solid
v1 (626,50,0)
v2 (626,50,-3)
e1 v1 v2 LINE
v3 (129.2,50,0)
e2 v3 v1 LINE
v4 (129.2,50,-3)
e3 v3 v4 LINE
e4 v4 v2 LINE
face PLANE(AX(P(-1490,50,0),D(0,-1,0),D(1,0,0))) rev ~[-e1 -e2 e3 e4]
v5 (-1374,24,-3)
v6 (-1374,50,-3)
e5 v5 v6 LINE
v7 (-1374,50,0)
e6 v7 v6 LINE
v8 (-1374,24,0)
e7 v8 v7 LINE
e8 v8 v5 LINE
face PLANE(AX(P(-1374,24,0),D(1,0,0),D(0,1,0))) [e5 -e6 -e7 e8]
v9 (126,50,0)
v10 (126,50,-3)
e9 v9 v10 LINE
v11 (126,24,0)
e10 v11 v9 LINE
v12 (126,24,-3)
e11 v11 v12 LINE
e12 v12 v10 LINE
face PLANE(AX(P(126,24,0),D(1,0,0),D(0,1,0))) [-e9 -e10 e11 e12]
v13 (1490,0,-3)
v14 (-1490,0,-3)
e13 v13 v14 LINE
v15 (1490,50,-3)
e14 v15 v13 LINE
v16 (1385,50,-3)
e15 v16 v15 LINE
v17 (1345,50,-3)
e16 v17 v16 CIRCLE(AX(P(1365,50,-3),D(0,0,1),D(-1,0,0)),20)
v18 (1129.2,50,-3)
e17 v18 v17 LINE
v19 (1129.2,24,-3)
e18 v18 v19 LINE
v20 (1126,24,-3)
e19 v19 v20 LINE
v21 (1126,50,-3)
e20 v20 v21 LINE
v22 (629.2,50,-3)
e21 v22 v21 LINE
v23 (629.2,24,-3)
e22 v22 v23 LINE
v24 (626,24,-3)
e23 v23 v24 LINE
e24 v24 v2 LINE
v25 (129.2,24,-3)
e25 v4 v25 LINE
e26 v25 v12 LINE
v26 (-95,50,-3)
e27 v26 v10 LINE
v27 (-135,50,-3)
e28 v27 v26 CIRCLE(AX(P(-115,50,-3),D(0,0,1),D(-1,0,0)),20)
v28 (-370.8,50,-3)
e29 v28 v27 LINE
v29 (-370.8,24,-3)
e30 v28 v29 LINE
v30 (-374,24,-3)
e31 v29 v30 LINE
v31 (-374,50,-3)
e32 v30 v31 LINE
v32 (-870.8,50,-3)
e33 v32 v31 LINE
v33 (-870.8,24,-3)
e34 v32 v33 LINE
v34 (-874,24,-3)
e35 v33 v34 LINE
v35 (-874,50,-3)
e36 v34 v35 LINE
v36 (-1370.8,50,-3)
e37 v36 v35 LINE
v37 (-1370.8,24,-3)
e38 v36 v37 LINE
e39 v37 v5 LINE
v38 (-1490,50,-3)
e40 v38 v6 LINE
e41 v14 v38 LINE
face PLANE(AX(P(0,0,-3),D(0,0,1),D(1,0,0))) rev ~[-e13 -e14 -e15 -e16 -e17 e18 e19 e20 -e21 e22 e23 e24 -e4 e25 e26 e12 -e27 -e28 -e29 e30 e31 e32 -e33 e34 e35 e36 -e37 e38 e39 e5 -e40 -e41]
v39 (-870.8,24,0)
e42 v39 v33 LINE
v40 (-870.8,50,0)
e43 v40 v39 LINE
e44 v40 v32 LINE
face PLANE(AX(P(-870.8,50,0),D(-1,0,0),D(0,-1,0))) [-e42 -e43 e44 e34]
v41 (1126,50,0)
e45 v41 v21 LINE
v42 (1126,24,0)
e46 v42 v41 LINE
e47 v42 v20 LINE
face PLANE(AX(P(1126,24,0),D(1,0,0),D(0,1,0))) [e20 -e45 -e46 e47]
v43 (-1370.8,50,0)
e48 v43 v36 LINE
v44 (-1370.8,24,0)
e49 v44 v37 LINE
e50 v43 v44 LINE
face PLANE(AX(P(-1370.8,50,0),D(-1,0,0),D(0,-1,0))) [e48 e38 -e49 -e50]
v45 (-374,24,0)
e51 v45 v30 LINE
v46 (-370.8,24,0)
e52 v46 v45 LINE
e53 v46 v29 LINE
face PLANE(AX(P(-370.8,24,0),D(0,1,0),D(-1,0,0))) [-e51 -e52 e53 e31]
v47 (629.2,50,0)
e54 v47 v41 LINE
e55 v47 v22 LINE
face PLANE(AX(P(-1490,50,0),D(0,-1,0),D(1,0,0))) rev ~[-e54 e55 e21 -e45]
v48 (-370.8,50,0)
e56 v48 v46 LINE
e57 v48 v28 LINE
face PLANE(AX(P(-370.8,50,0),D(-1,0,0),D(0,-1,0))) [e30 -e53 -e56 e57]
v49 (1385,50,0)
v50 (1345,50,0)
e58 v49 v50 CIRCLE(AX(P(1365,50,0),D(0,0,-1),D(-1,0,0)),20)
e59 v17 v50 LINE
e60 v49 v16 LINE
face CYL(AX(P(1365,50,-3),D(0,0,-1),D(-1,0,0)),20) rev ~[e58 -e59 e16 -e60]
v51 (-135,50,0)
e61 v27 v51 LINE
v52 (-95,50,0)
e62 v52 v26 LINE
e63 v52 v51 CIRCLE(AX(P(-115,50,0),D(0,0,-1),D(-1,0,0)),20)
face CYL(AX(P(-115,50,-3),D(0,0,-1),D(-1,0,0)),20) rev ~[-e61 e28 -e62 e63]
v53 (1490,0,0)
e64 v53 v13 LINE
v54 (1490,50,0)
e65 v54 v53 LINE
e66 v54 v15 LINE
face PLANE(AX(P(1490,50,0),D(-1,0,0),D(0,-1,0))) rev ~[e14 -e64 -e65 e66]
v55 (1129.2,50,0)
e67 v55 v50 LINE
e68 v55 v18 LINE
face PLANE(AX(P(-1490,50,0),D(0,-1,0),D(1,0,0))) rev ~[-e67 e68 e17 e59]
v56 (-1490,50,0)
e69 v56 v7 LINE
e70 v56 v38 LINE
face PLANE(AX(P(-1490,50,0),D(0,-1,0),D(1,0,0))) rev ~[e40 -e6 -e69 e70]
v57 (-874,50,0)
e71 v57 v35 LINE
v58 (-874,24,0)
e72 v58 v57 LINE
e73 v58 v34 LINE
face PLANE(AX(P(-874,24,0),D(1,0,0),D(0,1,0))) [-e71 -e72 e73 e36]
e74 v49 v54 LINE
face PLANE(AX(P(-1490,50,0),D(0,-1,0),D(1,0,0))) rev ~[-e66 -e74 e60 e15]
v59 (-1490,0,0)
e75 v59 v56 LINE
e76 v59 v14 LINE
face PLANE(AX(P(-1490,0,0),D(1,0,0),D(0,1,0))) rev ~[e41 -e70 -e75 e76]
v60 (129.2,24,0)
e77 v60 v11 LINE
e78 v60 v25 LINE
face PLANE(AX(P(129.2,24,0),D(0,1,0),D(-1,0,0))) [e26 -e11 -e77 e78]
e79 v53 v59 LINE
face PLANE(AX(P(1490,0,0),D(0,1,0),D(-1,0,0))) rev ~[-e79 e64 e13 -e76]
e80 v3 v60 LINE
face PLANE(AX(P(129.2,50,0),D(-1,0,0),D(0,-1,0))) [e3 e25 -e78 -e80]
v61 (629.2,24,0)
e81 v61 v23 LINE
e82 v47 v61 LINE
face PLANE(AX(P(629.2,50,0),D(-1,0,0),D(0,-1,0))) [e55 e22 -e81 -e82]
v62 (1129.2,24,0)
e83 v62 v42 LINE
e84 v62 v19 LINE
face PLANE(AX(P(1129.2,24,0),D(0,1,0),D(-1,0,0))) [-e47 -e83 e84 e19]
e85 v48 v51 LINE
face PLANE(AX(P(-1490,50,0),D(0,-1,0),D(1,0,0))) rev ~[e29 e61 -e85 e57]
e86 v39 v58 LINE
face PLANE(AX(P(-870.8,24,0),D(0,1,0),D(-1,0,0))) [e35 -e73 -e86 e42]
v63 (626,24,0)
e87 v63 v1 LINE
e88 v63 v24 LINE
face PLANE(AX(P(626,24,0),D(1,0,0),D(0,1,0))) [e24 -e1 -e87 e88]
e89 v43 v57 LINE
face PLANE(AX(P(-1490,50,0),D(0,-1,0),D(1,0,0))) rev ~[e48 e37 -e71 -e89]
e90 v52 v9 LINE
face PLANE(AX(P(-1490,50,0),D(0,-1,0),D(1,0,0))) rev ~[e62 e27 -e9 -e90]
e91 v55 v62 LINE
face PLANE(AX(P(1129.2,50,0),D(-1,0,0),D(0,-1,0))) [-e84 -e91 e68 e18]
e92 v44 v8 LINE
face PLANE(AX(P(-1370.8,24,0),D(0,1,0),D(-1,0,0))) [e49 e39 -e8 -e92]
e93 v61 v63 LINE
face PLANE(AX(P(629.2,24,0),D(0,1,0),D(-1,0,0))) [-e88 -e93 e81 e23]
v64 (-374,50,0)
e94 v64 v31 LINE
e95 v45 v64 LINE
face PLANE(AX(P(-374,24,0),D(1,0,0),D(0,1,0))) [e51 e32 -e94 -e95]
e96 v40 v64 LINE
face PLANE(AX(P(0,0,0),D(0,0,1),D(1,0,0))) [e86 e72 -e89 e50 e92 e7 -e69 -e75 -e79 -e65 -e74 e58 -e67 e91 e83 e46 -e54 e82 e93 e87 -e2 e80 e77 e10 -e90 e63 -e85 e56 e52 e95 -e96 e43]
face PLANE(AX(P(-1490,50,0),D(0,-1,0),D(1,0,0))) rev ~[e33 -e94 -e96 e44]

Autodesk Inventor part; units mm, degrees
ref_plane "YZ Plane" through (0, 0, 0) normal (1, 0, 0) x (0, 1, 0)
ref_plane "XZ Plane" through (0, 0, 0) normal (0, 1, 0) x (-1, 0, 0)
ref_plane "XY Plane" through (0, 0, 0) normal (0, 0, 1) x (1, 0, 0)
sketch "Sketch8" plane through (0, 0, 0) normal (0, 0, 1) x (1, 0, 0)
  line L0 (-1490, 50) -> (1490, 50)
  line L1 (1490, 50) -> (1490, 0)
  line L2 (1490, 0) -> (-1490, 0)
  line L3 (-1490, 0) -> (-1490, 50)
  point P0 (0, 0)
  point P1 (0, 0)
  dimension "d37" = 50
  dimension "d38" = 2980
extrude "Plate5" add sketch "Sketch8" against normal blind 3
sketch "Sketch9" plane through (0, 0, 0) normal (0, 0, 1) x (1, 0, 0)
  line L0 (1490, 50) -> (-1490, 50) projected
  line L1 (-1374, 50) -> (-1370.8, 50)
  line L2 (-1370.8, 50) -> (-1370.8, 24)
  line L3 (-1370.8, 24) -> (-1374, 24)
  line L4 (-1374, 24) -> (-1374, 50)
  point P0 (0, 0)
  point P1 (-1370.8, 50)
  dimension "d40" = 116
  dimension "d41" = 3.2
  dimension "d42" = 26
extrude "Extrusion3" cut sketch "Sketch9" against normal through all
pattern_linear "Rectangular Pattern2" count 6 spacing 500 along (1, 0, 0) of "Extrusion3"
sketch "Sketch10" plane through (0, 0, -3) normal (0, 0, -1) x (-1, 0, 0)
  line L0 (-626, 50) -> (-626, 24) projected
  line L1 (-626, 24) -> (-629.2, 24) projected
  line L2 (-629.2, 24) -> (-629.2, 50) projected
  line L3 (-1490, 50) -> (-1129.2, 50) projected
  line L4 (-1490, 0) -> (-1490, 50) projected
  line L5 (1490, 0) -> (-1490, 0) projected
  line L6 (1490, 50) -> (1490, 0) projected
  line L7 (1374, 50) -> (1490, 50) projected
  line L8 (1374, 50) -> (1374, 24) projected
  line L9 (1374, 24) -> (1370.8, 24) projected
  line L10 (1370.8, 24) -> (1370.8, 50) projected
  line L11 (874, 50) -> (1370.8, 50) projected
  line L12 (874, 50) -> (874, 24) projected
  line L13 (874, 24) -> (870.8, 24) projected
  line L14 (870.8, 24) -> (870.8, 50) projected
  line L15 (374, 50) -> (870.8, 50) projected
  line L16 (374, 50) -> (374, 24) projected
  line L17 (374, 24) -> (370.8, 24) projected
  line L18 (370.8, 24) -> (370.8, 50) projected
  line L19 (-126, 50) -> (370.8, 50) projected
  line L20 (-126, 50) -> (-126, 24) projected
  line L21 (-126, 24) -> (-129.2, 24) projected
  line L22 (-129.2, 24) -> (-129.2, 50) projected
  line L23 (-626, 50) -> (-129.2, 50) projected
  circle A0 centre (115, 50) radius 20
  line L24 (374, 50) -> (870.8, 50) projected
  circle A1 centre (-1365, 50) radius 20
  line L25 (-1126, 50) -> (-1126, 24) projected
  line L26 (-1126, 24) -> (-1129.2, 24) projected
  line L27 (-1129.2, 24) -> (-1129.2, 50) projected
  line L28 (-1126, 50) -> (-629.2, 50) projected
  point P0 (0, 0)
  point P1 (770, 50)
  point P2 (730, 50)
  point P3 (-710, 50)
  point P4 (-750, 50)
  point P5 (-1345, 50)
  point P6 (-1385, 50)
  dimension "d48" = 40
  dimension "d49" = 40
  dimension "d50" = 1480
  dimension "d51" = 125
extrude "Extrusion4" cut sketch "Sketch10" against normal through all contours A0 L19 | L19 A0 | A1 L3 | L3 A1
sketch "Sketch11" plane through (0, 0, -3) normal (0, 0, -1) x (-1, 0, 0)
  line L0 (-1348.785, 6.8732) -> (-1348.785, 21.8732) construction
  line L1 (-1348.785, 21.8732) -> (-1148.785, 21.8732) construction
  line L2 (-1148.785, 21.8732) -> (-1148.785, 6.8732) construction
  line L3 (-1148.785, 6.8732) -> (-1348.785, 6.8732) construction
  point P0 (0, 0)
  dimension "d54" = 200
  dimension "d55" = 15
mark "Mark1"
equation "\"d39\" = Thickness"
equation "\"BendReliefWidth\" = Thickness"
equation "\"BendReliefDepth\" = 0.5 * Thickness"
equation "\"CornerReliefSize\" = 4 * Thickness"
equation "\"MinimumRemnant\" = 2 * Thickness"
equation "\"TransitionRadius\" = BendRadius"
equation "\"JacobiRadiusSize\" = BendRadius"
equation "\"GapSize\" = Thickness"
equation "\"Thickness\" = 3"
equation "\"BendRadius\" = 5"
properties part number "BSH 031 stringer floor" material "09g2s"
